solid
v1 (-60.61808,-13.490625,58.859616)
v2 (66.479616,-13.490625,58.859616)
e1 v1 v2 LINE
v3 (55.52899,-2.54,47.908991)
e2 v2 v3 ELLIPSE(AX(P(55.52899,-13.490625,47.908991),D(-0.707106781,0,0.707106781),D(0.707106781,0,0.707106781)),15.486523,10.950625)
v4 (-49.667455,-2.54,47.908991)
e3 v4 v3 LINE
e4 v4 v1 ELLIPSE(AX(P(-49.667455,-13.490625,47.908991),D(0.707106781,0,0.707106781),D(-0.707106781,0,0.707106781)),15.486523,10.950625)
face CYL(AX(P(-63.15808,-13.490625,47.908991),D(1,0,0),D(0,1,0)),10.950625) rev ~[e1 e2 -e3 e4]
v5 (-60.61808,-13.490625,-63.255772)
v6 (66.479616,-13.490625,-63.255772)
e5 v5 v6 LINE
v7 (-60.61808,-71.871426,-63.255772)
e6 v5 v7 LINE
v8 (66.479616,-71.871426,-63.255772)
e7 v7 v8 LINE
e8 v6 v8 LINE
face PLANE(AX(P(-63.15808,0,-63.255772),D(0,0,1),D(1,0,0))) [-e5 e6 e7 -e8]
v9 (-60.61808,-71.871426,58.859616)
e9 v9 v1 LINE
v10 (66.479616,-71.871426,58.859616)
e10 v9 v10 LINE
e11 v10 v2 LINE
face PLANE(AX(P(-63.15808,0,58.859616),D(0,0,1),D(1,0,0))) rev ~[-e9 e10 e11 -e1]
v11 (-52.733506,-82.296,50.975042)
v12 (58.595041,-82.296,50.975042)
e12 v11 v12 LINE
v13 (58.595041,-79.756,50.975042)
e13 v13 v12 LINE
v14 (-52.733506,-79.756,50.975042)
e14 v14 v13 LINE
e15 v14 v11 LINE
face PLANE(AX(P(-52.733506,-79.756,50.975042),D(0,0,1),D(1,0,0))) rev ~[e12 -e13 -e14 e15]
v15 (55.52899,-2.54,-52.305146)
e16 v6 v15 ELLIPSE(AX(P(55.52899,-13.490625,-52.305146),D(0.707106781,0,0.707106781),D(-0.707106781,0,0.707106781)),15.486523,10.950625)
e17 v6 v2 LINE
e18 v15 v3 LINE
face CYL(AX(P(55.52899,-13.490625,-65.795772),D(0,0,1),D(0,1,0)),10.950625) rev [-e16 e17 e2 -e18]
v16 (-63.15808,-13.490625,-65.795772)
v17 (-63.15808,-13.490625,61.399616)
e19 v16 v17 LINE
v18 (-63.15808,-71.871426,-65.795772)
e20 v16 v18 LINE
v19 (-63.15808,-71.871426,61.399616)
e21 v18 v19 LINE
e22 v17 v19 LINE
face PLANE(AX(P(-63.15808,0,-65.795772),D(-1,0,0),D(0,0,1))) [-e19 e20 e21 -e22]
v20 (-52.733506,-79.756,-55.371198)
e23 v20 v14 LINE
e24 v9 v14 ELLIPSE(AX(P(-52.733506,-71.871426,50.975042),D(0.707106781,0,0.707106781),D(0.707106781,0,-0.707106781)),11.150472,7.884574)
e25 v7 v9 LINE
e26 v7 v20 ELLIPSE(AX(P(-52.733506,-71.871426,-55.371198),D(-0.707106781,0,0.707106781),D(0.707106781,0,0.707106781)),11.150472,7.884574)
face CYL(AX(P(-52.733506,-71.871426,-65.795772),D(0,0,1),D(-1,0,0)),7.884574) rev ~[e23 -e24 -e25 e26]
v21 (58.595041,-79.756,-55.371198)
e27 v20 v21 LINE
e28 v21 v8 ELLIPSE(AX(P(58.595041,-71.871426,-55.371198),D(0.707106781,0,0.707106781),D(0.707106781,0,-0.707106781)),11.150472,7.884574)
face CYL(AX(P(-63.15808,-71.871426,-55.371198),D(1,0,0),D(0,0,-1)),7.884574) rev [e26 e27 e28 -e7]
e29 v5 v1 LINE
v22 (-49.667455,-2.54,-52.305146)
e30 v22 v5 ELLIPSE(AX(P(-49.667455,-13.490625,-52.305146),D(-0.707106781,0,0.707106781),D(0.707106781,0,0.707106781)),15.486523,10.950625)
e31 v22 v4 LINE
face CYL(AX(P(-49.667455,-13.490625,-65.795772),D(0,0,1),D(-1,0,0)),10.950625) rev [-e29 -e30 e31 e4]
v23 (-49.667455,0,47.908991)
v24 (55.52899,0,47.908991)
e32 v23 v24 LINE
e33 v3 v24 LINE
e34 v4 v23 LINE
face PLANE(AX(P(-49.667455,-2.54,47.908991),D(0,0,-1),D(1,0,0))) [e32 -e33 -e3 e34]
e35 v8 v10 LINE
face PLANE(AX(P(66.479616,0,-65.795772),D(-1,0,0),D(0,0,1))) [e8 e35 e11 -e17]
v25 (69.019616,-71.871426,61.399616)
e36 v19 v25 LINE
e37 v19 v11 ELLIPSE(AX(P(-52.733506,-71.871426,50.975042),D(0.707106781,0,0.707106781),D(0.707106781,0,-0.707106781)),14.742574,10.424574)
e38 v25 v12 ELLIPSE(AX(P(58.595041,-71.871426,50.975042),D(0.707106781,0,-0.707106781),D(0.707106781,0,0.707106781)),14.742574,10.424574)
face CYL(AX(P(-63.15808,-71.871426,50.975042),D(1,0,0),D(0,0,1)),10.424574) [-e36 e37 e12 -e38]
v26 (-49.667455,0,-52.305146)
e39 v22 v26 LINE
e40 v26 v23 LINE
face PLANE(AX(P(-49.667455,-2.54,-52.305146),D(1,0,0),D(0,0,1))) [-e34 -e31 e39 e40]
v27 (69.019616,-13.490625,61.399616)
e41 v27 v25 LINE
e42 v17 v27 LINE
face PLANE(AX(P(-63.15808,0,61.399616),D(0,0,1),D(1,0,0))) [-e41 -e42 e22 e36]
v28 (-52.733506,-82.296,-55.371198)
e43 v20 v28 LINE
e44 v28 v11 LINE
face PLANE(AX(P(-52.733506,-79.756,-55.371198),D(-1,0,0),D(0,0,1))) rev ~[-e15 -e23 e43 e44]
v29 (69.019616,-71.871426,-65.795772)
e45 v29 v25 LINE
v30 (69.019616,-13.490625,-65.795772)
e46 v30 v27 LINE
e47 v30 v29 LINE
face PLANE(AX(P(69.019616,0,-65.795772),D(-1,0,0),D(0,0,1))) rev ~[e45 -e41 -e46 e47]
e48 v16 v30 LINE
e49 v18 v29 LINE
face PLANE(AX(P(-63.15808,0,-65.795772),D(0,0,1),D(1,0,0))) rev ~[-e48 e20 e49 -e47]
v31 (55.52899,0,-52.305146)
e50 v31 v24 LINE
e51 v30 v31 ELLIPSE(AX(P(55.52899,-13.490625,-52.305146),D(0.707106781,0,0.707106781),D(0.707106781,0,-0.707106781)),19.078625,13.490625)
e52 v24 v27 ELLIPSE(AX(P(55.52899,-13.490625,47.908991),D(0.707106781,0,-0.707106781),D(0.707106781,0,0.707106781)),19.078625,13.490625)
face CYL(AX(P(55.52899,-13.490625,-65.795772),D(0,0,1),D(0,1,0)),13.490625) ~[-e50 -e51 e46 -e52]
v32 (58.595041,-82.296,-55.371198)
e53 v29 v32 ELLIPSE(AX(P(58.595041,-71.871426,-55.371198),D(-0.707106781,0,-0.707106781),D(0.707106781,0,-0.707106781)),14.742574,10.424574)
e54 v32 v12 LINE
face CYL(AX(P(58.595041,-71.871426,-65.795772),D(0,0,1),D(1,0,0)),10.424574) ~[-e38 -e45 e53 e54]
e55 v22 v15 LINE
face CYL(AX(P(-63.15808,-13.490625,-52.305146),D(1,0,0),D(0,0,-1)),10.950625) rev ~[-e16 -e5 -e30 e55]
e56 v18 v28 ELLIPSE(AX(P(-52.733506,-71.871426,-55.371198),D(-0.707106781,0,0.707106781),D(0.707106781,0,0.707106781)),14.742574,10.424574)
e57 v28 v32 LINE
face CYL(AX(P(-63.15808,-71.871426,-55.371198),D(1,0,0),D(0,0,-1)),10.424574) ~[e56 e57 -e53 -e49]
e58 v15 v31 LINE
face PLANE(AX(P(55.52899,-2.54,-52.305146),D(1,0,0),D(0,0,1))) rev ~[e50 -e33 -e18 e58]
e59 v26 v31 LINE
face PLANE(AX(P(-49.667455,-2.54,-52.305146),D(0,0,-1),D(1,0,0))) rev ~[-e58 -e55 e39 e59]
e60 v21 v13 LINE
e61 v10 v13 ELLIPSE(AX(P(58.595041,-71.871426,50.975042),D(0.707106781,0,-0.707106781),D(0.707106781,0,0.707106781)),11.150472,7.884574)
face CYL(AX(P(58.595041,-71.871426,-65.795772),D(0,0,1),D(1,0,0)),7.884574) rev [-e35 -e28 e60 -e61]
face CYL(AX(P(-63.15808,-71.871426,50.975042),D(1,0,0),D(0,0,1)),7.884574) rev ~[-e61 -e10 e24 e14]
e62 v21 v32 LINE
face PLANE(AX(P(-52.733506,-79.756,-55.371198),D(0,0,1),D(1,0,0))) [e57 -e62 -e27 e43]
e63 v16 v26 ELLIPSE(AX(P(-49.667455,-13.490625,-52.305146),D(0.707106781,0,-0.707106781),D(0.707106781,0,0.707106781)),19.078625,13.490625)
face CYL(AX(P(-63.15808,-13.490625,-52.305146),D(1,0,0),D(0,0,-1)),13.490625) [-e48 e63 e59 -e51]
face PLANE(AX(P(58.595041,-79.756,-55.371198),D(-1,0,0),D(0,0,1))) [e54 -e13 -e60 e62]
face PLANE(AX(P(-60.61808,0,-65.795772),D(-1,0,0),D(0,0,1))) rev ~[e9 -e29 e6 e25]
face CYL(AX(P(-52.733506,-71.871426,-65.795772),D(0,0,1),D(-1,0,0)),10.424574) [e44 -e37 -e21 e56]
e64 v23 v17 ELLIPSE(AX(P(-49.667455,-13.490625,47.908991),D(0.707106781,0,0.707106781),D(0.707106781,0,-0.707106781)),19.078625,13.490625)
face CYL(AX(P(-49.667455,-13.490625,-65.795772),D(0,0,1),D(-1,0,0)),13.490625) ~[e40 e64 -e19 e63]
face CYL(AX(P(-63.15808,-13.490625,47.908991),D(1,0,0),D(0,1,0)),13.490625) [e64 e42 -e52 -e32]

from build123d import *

# Parameters (mm, degrees)
F0_W     = 132.177695632
F0_H     = 127.1953880787
F1_DEPTH = 82.296
F2_R     = 10.4245741623
F3_R     = 13.4906253865
F4_T     = -2.54


# Not quite as in the source:
# - a shell that OpenCascade refuses in one call is made with other operations: the cavity is built on its own and cut out


with BuildPart() as f1:
    # F0 (on Front) → F1 (new body)
    with BuildSketch(Plane.XZ):
        with Locations((2.9307678342, -2.1980777383)):
            Rectangle(F0_W, F0_H)
    extrude(amount=F1_DEPTH)

    # F2
    f2_edges = [f1.edges().sort_by_distance(p)[0] for p in [
        (2.930768, -82.296, 61.399616),
        (-63.15808, -82.296, -2.198078),
        (2.930768, -82.296, -65.795772),
        (69.019616, -82.296, -2.198078),
    ]]
    fillet(f2_edges, radius=F2_R)

    # F3
    f3_edges = [f1.edges().sort_by_distance(p)[0] for p in [
        (2.930768, 0, 61.399616),
        (-63.15808, 0, -2.198078),
        (2.930768, 0, -65.795772),
        (69.019616, 0, -2.198078),
    ]]
    fillet(f3_edges, radius=F3_R)

    # F4: a shell. OpenCascade refuses it in one call, so the cavity is built on its own and cut out:
    # the body offset inwards by the wall thickness, plus a prism from it out through each open face.
    f4_core = offset(f1.part, amount=F4_T, mode=Mode.PRIVATE)
    f4_exits = [f4_core.faces().sort_by_distance(p)[0] for p in [
        (2.930768, -79.756, -2.198078),
        (2.930768, -2.54, -2.198078),
    ]]
    add(f4_core, mode=Mode.SUBTRACT)
    extrude(f4_exits, amount=-F4_T, mode=Mode.SUBTRACT)


solid = f1.part
